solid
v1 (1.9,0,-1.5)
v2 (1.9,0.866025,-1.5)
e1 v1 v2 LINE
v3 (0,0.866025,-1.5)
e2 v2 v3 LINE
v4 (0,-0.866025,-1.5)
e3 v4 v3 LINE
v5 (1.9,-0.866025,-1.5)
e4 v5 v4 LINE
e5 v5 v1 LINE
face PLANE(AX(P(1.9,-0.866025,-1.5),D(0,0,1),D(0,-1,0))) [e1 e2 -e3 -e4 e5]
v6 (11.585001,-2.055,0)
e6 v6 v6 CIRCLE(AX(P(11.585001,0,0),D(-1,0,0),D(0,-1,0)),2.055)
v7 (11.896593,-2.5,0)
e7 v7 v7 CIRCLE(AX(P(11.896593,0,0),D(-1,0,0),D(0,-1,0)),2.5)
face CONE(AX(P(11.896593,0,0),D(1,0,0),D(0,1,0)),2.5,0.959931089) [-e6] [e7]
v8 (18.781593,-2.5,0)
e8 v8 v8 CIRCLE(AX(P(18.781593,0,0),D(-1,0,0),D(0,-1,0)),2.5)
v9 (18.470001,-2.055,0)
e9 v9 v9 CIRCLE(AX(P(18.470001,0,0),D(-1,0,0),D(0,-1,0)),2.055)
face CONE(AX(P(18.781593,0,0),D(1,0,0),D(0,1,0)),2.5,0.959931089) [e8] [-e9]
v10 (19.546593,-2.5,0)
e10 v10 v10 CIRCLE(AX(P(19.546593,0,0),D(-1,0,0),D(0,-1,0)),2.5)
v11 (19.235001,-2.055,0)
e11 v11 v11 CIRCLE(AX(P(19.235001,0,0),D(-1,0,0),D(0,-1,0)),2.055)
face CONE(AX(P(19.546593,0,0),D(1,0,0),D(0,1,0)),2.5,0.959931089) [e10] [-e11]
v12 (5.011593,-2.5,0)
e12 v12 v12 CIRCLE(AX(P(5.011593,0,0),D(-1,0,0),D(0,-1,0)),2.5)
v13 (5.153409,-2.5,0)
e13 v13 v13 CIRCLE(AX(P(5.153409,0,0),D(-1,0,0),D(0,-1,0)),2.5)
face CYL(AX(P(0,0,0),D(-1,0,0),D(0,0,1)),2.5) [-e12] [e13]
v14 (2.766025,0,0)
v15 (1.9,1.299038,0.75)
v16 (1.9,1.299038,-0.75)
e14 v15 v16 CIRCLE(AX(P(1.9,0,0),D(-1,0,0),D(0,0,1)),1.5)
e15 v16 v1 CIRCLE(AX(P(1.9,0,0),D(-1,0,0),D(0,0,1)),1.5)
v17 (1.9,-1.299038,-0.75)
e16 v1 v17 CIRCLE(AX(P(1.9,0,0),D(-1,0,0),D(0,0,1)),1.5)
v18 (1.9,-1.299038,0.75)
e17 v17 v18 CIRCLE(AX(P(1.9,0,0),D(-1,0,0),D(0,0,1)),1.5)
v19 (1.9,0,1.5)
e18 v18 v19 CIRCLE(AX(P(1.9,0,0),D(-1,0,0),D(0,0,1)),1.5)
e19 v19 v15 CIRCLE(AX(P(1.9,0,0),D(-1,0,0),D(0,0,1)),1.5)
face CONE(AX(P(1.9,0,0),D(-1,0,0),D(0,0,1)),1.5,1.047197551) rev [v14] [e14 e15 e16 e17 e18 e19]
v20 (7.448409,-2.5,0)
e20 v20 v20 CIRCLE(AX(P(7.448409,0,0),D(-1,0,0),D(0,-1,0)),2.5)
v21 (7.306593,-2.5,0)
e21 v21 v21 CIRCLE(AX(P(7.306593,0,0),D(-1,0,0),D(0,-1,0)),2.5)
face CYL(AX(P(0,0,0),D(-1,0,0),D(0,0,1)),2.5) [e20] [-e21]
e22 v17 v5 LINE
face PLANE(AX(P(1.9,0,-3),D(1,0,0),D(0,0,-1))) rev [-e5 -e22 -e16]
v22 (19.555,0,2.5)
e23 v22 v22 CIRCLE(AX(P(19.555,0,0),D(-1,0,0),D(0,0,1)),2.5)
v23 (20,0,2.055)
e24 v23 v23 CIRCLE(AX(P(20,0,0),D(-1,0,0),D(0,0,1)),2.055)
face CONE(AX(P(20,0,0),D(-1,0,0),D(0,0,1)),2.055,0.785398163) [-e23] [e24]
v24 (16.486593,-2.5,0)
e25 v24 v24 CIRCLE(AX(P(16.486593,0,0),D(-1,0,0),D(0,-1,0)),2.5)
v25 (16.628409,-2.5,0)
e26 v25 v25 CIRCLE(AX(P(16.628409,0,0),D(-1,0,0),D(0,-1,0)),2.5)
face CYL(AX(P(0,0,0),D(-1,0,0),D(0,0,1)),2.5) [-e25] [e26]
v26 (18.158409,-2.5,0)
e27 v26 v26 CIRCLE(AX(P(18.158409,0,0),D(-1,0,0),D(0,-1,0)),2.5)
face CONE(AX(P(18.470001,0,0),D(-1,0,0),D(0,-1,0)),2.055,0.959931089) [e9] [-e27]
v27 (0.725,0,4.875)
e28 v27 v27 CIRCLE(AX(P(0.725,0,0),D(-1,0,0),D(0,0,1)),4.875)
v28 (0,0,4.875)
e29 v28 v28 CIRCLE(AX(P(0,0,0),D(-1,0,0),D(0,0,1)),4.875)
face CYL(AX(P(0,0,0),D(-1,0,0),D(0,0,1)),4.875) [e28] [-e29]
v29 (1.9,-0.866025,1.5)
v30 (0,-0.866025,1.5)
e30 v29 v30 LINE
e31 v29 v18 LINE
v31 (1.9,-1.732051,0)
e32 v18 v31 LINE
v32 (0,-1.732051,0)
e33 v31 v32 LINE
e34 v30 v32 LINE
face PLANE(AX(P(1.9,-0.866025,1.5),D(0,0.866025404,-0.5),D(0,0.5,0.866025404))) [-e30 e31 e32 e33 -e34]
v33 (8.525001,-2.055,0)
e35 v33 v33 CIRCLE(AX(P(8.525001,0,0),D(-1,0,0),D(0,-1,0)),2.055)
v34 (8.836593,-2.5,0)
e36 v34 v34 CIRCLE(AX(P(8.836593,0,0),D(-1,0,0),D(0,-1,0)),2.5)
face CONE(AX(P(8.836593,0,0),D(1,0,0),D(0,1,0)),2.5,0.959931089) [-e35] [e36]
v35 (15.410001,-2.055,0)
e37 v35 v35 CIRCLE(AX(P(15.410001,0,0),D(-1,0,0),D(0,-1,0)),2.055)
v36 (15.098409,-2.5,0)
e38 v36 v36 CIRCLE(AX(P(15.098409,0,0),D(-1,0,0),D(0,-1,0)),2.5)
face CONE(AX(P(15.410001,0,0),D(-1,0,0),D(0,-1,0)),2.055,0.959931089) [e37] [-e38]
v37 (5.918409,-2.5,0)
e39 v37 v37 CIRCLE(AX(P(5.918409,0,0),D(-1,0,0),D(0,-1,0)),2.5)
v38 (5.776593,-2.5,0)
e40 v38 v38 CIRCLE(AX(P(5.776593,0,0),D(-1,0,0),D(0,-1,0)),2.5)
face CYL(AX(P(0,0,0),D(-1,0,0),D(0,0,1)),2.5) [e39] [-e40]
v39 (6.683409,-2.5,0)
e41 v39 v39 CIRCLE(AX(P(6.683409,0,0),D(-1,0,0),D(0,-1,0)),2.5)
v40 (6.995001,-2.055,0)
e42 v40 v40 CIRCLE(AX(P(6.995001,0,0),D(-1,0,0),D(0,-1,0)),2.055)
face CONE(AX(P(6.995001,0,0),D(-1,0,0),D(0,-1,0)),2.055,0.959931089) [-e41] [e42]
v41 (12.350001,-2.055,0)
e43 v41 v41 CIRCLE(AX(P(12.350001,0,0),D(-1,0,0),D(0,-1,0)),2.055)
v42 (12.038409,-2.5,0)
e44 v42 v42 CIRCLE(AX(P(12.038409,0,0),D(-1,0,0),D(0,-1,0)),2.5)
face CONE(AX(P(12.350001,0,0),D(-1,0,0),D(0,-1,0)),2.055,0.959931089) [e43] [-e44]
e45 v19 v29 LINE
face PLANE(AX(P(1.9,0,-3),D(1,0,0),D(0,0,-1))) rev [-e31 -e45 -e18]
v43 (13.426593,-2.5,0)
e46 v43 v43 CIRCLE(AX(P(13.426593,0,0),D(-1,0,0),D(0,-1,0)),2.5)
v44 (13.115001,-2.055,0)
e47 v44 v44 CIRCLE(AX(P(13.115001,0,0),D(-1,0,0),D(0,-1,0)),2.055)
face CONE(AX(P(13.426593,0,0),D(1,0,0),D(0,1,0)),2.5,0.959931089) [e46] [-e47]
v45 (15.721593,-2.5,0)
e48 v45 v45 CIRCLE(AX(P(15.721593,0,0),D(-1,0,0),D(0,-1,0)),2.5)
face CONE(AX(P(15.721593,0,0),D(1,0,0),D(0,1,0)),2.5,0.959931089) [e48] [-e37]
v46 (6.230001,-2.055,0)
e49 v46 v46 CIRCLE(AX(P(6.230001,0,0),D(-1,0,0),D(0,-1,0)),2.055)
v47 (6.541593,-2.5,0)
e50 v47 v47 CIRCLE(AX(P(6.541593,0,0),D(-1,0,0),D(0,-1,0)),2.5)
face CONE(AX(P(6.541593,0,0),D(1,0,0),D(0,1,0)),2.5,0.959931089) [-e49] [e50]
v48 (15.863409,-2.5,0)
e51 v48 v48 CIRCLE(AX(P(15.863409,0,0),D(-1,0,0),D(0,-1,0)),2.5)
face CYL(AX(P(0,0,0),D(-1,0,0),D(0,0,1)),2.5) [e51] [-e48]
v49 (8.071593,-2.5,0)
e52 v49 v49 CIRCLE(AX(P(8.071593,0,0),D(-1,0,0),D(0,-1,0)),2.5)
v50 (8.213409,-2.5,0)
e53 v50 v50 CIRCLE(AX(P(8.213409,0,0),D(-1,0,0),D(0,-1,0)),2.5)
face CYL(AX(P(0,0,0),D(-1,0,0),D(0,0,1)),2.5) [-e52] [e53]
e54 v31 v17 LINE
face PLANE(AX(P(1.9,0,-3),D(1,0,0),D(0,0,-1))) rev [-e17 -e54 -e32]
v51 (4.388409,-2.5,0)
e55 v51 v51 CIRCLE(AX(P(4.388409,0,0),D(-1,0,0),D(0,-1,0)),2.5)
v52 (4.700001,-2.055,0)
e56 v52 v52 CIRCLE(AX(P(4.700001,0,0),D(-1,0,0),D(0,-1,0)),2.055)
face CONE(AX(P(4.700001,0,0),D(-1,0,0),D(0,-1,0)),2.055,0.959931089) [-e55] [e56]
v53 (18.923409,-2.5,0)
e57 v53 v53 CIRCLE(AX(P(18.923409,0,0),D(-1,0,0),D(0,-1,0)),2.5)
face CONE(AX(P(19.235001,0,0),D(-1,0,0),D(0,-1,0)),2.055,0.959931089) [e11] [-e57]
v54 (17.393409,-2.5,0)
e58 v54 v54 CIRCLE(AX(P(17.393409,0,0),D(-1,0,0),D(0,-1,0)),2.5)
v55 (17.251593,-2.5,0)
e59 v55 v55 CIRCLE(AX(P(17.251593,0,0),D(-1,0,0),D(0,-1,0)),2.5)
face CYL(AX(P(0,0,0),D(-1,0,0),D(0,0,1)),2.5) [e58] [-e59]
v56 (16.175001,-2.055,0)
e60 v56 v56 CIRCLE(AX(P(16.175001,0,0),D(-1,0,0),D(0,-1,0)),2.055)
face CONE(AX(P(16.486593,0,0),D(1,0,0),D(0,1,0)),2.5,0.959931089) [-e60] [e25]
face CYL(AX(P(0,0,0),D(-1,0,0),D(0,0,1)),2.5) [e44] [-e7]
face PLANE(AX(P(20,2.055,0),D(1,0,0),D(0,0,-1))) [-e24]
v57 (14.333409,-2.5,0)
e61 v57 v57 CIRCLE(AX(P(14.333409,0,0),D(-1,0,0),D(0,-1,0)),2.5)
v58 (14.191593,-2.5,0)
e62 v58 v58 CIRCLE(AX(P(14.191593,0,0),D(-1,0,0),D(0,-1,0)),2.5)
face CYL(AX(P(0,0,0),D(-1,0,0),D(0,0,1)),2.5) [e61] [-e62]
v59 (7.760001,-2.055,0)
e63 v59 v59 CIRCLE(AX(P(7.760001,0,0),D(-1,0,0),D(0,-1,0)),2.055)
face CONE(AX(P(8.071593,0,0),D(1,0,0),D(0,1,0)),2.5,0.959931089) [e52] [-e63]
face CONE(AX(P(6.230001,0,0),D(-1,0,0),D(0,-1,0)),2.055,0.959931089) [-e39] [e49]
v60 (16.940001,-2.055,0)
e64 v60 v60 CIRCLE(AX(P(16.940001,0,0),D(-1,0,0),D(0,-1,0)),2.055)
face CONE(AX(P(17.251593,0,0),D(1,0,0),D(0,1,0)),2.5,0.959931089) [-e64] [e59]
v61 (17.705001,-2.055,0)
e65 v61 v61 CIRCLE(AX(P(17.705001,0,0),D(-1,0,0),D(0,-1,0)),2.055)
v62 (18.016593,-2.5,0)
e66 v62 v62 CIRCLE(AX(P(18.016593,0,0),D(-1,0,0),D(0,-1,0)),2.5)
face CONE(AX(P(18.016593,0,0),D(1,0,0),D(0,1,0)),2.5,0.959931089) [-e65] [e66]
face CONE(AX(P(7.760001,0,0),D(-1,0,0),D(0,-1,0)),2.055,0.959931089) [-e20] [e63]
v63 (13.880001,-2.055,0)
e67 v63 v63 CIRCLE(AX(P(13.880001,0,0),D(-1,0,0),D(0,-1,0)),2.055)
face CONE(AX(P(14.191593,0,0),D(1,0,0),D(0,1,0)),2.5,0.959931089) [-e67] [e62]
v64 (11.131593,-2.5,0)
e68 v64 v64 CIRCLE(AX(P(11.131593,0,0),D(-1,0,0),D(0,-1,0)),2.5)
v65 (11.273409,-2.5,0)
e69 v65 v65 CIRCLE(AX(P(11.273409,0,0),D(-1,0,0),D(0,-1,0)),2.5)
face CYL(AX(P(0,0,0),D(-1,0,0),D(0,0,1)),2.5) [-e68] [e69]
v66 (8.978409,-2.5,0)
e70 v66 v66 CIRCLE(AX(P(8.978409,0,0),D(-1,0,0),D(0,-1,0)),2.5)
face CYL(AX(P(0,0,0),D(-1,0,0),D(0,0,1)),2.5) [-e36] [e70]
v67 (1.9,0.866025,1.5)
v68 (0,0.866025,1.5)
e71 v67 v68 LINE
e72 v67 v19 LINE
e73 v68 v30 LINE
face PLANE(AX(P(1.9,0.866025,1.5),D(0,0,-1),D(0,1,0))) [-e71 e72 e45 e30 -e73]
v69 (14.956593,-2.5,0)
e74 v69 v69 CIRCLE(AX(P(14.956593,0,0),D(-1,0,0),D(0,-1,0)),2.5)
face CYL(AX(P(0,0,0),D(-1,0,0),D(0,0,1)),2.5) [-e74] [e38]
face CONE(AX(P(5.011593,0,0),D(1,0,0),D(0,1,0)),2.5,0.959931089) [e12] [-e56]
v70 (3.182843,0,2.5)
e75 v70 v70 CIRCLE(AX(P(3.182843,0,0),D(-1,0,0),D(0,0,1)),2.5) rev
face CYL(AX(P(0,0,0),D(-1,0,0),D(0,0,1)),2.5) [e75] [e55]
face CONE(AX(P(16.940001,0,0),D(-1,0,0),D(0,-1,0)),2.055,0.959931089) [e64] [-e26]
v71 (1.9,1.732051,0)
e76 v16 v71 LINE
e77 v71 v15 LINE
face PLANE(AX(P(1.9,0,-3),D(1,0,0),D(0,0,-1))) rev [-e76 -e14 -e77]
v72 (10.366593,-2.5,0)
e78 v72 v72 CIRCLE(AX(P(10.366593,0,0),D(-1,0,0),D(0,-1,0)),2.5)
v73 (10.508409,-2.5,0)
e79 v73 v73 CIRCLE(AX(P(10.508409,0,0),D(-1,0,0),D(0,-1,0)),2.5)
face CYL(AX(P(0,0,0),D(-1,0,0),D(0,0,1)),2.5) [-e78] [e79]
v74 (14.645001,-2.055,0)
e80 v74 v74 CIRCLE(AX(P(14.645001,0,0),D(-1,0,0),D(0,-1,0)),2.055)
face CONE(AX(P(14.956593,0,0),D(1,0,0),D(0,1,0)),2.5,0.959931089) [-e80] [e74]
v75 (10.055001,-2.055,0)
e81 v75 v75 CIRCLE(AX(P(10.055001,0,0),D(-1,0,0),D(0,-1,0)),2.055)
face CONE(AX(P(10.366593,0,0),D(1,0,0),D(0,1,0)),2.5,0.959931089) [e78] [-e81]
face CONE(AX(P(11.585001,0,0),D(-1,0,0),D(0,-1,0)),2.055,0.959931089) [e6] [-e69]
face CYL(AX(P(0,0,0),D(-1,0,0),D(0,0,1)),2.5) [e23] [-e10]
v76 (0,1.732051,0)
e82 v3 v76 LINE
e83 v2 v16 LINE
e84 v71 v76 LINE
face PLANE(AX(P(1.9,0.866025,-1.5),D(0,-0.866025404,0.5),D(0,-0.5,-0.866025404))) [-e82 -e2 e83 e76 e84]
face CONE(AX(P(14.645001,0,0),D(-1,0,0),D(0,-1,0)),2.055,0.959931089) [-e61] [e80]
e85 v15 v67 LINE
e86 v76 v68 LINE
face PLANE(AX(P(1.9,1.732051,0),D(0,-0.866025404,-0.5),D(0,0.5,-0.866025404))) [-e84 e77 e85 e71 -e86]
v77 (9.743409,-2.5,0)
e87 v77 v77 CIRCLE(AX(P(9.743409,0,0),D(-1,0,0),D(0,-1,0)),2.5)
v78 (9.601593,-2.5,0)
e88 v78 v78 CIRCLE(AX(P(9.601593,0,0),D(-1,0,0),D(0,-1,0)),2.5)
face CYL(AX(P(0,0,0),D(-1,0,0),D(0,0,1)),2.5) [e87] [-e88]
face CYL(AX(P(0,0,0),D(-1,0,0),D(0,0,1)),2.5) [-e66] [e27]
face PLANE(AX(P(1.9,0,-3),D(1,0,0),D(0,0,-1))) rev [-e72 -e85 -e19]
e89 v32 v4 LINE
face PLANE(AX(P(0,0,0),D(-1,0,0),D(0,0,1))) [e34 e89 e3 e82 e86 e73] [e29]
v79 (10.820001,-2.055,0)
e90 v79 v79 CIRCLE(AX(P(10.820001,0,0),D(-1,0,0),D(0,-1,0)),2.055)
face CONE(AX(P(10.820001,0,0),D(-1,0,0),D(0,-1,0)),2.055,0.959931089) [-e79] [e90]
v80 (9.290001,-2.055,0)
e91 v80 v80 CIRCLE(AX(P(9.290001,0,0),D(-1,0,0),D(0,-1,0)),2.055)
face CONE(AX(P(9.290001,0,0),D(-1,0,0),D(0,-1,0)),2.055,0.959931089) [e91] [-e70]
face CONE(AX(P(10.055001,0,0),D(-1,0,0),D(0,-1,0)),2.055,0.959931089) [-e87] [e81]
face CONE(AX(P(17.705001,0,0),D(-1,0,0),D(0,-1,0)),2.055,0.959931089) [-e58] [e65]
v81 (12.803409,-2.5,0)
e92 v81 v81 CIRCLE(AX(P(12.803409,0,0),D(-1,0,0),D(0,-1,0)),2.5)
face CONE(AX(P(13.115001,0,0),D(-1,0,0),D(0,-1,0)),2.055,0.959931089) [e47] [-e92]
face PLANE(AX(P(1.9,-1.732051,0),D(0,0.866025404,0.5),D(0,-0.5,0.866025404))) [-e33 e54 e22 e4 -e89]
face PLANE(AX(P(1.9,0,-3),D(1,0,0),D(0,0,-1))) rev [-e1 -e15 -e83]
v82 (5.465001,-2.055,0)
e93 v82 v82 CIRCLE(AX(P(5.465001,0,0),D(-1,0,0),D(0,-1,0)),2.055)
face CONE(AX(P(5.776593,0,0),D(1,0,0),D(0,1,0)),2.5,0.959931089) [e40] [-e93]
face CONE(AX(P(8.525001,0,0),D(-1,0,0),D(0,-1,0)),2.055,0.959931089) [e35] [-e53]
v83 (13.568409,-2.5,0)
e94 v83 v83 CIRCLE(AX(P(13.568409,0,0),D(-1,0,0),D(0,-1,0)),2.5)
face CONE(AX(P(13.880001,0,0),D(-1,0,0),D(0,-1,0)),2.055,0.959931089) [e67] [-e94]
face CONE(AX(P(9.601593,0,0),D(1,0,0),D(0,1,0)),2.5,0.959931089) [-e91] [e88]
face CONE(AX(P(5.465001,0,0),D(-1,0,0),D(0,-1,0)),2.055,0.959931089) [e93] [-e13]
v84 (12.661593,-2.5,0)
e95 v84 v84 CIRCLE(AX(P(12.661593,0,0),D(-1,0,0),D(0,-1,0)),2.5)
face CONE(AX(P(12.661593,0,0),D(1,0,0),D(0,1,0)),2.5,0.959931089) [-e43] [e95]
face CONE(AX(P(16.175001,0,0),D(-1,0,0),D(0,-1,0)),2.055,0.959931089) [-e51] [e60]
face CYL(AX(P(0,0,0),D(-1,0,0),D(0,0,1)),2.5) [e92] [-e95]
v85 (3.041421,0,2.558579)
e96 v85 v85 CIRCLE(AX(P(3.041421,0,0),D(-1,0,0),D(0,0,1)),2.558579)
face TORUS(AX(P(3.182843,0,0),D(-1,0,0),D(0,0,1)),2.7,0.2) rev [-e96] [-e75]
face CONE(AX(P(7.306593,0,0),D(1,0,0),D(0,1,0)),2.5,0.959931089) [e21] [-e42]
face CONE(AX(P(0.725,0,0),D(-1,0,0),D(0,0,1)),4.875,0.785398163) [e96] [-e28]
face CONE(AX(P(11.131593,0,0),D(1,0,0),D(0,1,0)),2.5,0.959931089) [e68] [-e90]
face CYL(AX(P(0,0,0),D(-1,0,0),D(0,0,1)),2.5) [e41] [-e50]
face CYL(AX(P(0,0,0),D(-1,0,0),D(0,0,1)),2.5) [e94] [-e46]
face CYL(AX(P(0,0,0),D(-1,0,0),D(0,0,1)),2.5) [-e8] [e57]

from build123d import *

# Parameters (mm, degrees)
FILLET1_R       = 0.2
HEX_START       = -1.9
HEX_2_DEPTH     = 1.9
THDSCHPAT_COUNT = 20
THDSCHPAT_PITCH = 0.765


with BuildPart() as part:
    # BodySke → BaseBody (revolve)
    with BuildSketch(Plane.XY, mode=Mode.PRIVATE) as basebody_sk:
        Polygon((0, 0), (0, 4.875), (0.725, 4.875), (3.1, 2.5), (19.555, 2.5), (20, 2.055), (20, 0), align=None)
    revolve(basebody_sk.sketch.rotate(Axis((0, 0, 0), (1, 0, 0)), 90), axis=Axis((0, 0, 0), (1, 0, 0)))

    # Fillet1
    fillet1_edges = [part.edges().sort_by_distance(p)[0] for p in [
        (3.1, 0, -2.5),
    ]]
    fillet(fillet1_edges, radius=FILLET1_R)

    # Hex 2: read off the stored shape, not the designer's step
    # Hex 2 outline → Hex 2 (cut)
    with BuildSketch(Plane.ZY.offset(HEX_START)):
        Polygon((-1.5, -0.866025404), (0, -1.732050808), (1.5, -0.866025404), (1.5, 0.866025404), (0, 1.732050808), (-1.5, 0.866025404), align=None)
    extrude(amount=HEX_2_DEPTH, mode=Mode.SUBTRACT)

    # Hex 2 2 outline → Hex 2 2 (revolve, cut)
    with BuildSketch(Plane.YX):
        Polygon((1.5, 1.9), (0, 2.766025404), (0, 1.9), align=None)
    revolve(axis=Axis((0, 0, 0), (1, 0, 0)), mode=Mode.SUBTRACT)

    # ThdSchSke → ThreadSchematic (revolve, cut)
    with BuildSketch(Plane.XY, mode=Mode.PRIVATE) as threadschematic_sk:
        Polygon((4.700001, -2.055), (4.388408645, -2.5), (4.388408645, -3.125), (5.011593355, -3.125), (5.011593355, -2.5), align=None)
    threadschematic = revolve(threadschematic_sk.sketch.rotate(Axis((-3.175, 0, 0), (1, 0, 0)), 270), axis=Axis((-3.175, 0, 0), (1, 0, 0)), mode=Mode.SUBTRACT)

    # ThdSchPat: ThreadSchematic ×20
    with Locations(*[(i * THDSCHPAT_PITCH, 0, 0) for i in range(1, THDSCHPAT_COUNT)]):
        add(threadschematic, mode=Mode.SUBTRACT)


solid = part.part
